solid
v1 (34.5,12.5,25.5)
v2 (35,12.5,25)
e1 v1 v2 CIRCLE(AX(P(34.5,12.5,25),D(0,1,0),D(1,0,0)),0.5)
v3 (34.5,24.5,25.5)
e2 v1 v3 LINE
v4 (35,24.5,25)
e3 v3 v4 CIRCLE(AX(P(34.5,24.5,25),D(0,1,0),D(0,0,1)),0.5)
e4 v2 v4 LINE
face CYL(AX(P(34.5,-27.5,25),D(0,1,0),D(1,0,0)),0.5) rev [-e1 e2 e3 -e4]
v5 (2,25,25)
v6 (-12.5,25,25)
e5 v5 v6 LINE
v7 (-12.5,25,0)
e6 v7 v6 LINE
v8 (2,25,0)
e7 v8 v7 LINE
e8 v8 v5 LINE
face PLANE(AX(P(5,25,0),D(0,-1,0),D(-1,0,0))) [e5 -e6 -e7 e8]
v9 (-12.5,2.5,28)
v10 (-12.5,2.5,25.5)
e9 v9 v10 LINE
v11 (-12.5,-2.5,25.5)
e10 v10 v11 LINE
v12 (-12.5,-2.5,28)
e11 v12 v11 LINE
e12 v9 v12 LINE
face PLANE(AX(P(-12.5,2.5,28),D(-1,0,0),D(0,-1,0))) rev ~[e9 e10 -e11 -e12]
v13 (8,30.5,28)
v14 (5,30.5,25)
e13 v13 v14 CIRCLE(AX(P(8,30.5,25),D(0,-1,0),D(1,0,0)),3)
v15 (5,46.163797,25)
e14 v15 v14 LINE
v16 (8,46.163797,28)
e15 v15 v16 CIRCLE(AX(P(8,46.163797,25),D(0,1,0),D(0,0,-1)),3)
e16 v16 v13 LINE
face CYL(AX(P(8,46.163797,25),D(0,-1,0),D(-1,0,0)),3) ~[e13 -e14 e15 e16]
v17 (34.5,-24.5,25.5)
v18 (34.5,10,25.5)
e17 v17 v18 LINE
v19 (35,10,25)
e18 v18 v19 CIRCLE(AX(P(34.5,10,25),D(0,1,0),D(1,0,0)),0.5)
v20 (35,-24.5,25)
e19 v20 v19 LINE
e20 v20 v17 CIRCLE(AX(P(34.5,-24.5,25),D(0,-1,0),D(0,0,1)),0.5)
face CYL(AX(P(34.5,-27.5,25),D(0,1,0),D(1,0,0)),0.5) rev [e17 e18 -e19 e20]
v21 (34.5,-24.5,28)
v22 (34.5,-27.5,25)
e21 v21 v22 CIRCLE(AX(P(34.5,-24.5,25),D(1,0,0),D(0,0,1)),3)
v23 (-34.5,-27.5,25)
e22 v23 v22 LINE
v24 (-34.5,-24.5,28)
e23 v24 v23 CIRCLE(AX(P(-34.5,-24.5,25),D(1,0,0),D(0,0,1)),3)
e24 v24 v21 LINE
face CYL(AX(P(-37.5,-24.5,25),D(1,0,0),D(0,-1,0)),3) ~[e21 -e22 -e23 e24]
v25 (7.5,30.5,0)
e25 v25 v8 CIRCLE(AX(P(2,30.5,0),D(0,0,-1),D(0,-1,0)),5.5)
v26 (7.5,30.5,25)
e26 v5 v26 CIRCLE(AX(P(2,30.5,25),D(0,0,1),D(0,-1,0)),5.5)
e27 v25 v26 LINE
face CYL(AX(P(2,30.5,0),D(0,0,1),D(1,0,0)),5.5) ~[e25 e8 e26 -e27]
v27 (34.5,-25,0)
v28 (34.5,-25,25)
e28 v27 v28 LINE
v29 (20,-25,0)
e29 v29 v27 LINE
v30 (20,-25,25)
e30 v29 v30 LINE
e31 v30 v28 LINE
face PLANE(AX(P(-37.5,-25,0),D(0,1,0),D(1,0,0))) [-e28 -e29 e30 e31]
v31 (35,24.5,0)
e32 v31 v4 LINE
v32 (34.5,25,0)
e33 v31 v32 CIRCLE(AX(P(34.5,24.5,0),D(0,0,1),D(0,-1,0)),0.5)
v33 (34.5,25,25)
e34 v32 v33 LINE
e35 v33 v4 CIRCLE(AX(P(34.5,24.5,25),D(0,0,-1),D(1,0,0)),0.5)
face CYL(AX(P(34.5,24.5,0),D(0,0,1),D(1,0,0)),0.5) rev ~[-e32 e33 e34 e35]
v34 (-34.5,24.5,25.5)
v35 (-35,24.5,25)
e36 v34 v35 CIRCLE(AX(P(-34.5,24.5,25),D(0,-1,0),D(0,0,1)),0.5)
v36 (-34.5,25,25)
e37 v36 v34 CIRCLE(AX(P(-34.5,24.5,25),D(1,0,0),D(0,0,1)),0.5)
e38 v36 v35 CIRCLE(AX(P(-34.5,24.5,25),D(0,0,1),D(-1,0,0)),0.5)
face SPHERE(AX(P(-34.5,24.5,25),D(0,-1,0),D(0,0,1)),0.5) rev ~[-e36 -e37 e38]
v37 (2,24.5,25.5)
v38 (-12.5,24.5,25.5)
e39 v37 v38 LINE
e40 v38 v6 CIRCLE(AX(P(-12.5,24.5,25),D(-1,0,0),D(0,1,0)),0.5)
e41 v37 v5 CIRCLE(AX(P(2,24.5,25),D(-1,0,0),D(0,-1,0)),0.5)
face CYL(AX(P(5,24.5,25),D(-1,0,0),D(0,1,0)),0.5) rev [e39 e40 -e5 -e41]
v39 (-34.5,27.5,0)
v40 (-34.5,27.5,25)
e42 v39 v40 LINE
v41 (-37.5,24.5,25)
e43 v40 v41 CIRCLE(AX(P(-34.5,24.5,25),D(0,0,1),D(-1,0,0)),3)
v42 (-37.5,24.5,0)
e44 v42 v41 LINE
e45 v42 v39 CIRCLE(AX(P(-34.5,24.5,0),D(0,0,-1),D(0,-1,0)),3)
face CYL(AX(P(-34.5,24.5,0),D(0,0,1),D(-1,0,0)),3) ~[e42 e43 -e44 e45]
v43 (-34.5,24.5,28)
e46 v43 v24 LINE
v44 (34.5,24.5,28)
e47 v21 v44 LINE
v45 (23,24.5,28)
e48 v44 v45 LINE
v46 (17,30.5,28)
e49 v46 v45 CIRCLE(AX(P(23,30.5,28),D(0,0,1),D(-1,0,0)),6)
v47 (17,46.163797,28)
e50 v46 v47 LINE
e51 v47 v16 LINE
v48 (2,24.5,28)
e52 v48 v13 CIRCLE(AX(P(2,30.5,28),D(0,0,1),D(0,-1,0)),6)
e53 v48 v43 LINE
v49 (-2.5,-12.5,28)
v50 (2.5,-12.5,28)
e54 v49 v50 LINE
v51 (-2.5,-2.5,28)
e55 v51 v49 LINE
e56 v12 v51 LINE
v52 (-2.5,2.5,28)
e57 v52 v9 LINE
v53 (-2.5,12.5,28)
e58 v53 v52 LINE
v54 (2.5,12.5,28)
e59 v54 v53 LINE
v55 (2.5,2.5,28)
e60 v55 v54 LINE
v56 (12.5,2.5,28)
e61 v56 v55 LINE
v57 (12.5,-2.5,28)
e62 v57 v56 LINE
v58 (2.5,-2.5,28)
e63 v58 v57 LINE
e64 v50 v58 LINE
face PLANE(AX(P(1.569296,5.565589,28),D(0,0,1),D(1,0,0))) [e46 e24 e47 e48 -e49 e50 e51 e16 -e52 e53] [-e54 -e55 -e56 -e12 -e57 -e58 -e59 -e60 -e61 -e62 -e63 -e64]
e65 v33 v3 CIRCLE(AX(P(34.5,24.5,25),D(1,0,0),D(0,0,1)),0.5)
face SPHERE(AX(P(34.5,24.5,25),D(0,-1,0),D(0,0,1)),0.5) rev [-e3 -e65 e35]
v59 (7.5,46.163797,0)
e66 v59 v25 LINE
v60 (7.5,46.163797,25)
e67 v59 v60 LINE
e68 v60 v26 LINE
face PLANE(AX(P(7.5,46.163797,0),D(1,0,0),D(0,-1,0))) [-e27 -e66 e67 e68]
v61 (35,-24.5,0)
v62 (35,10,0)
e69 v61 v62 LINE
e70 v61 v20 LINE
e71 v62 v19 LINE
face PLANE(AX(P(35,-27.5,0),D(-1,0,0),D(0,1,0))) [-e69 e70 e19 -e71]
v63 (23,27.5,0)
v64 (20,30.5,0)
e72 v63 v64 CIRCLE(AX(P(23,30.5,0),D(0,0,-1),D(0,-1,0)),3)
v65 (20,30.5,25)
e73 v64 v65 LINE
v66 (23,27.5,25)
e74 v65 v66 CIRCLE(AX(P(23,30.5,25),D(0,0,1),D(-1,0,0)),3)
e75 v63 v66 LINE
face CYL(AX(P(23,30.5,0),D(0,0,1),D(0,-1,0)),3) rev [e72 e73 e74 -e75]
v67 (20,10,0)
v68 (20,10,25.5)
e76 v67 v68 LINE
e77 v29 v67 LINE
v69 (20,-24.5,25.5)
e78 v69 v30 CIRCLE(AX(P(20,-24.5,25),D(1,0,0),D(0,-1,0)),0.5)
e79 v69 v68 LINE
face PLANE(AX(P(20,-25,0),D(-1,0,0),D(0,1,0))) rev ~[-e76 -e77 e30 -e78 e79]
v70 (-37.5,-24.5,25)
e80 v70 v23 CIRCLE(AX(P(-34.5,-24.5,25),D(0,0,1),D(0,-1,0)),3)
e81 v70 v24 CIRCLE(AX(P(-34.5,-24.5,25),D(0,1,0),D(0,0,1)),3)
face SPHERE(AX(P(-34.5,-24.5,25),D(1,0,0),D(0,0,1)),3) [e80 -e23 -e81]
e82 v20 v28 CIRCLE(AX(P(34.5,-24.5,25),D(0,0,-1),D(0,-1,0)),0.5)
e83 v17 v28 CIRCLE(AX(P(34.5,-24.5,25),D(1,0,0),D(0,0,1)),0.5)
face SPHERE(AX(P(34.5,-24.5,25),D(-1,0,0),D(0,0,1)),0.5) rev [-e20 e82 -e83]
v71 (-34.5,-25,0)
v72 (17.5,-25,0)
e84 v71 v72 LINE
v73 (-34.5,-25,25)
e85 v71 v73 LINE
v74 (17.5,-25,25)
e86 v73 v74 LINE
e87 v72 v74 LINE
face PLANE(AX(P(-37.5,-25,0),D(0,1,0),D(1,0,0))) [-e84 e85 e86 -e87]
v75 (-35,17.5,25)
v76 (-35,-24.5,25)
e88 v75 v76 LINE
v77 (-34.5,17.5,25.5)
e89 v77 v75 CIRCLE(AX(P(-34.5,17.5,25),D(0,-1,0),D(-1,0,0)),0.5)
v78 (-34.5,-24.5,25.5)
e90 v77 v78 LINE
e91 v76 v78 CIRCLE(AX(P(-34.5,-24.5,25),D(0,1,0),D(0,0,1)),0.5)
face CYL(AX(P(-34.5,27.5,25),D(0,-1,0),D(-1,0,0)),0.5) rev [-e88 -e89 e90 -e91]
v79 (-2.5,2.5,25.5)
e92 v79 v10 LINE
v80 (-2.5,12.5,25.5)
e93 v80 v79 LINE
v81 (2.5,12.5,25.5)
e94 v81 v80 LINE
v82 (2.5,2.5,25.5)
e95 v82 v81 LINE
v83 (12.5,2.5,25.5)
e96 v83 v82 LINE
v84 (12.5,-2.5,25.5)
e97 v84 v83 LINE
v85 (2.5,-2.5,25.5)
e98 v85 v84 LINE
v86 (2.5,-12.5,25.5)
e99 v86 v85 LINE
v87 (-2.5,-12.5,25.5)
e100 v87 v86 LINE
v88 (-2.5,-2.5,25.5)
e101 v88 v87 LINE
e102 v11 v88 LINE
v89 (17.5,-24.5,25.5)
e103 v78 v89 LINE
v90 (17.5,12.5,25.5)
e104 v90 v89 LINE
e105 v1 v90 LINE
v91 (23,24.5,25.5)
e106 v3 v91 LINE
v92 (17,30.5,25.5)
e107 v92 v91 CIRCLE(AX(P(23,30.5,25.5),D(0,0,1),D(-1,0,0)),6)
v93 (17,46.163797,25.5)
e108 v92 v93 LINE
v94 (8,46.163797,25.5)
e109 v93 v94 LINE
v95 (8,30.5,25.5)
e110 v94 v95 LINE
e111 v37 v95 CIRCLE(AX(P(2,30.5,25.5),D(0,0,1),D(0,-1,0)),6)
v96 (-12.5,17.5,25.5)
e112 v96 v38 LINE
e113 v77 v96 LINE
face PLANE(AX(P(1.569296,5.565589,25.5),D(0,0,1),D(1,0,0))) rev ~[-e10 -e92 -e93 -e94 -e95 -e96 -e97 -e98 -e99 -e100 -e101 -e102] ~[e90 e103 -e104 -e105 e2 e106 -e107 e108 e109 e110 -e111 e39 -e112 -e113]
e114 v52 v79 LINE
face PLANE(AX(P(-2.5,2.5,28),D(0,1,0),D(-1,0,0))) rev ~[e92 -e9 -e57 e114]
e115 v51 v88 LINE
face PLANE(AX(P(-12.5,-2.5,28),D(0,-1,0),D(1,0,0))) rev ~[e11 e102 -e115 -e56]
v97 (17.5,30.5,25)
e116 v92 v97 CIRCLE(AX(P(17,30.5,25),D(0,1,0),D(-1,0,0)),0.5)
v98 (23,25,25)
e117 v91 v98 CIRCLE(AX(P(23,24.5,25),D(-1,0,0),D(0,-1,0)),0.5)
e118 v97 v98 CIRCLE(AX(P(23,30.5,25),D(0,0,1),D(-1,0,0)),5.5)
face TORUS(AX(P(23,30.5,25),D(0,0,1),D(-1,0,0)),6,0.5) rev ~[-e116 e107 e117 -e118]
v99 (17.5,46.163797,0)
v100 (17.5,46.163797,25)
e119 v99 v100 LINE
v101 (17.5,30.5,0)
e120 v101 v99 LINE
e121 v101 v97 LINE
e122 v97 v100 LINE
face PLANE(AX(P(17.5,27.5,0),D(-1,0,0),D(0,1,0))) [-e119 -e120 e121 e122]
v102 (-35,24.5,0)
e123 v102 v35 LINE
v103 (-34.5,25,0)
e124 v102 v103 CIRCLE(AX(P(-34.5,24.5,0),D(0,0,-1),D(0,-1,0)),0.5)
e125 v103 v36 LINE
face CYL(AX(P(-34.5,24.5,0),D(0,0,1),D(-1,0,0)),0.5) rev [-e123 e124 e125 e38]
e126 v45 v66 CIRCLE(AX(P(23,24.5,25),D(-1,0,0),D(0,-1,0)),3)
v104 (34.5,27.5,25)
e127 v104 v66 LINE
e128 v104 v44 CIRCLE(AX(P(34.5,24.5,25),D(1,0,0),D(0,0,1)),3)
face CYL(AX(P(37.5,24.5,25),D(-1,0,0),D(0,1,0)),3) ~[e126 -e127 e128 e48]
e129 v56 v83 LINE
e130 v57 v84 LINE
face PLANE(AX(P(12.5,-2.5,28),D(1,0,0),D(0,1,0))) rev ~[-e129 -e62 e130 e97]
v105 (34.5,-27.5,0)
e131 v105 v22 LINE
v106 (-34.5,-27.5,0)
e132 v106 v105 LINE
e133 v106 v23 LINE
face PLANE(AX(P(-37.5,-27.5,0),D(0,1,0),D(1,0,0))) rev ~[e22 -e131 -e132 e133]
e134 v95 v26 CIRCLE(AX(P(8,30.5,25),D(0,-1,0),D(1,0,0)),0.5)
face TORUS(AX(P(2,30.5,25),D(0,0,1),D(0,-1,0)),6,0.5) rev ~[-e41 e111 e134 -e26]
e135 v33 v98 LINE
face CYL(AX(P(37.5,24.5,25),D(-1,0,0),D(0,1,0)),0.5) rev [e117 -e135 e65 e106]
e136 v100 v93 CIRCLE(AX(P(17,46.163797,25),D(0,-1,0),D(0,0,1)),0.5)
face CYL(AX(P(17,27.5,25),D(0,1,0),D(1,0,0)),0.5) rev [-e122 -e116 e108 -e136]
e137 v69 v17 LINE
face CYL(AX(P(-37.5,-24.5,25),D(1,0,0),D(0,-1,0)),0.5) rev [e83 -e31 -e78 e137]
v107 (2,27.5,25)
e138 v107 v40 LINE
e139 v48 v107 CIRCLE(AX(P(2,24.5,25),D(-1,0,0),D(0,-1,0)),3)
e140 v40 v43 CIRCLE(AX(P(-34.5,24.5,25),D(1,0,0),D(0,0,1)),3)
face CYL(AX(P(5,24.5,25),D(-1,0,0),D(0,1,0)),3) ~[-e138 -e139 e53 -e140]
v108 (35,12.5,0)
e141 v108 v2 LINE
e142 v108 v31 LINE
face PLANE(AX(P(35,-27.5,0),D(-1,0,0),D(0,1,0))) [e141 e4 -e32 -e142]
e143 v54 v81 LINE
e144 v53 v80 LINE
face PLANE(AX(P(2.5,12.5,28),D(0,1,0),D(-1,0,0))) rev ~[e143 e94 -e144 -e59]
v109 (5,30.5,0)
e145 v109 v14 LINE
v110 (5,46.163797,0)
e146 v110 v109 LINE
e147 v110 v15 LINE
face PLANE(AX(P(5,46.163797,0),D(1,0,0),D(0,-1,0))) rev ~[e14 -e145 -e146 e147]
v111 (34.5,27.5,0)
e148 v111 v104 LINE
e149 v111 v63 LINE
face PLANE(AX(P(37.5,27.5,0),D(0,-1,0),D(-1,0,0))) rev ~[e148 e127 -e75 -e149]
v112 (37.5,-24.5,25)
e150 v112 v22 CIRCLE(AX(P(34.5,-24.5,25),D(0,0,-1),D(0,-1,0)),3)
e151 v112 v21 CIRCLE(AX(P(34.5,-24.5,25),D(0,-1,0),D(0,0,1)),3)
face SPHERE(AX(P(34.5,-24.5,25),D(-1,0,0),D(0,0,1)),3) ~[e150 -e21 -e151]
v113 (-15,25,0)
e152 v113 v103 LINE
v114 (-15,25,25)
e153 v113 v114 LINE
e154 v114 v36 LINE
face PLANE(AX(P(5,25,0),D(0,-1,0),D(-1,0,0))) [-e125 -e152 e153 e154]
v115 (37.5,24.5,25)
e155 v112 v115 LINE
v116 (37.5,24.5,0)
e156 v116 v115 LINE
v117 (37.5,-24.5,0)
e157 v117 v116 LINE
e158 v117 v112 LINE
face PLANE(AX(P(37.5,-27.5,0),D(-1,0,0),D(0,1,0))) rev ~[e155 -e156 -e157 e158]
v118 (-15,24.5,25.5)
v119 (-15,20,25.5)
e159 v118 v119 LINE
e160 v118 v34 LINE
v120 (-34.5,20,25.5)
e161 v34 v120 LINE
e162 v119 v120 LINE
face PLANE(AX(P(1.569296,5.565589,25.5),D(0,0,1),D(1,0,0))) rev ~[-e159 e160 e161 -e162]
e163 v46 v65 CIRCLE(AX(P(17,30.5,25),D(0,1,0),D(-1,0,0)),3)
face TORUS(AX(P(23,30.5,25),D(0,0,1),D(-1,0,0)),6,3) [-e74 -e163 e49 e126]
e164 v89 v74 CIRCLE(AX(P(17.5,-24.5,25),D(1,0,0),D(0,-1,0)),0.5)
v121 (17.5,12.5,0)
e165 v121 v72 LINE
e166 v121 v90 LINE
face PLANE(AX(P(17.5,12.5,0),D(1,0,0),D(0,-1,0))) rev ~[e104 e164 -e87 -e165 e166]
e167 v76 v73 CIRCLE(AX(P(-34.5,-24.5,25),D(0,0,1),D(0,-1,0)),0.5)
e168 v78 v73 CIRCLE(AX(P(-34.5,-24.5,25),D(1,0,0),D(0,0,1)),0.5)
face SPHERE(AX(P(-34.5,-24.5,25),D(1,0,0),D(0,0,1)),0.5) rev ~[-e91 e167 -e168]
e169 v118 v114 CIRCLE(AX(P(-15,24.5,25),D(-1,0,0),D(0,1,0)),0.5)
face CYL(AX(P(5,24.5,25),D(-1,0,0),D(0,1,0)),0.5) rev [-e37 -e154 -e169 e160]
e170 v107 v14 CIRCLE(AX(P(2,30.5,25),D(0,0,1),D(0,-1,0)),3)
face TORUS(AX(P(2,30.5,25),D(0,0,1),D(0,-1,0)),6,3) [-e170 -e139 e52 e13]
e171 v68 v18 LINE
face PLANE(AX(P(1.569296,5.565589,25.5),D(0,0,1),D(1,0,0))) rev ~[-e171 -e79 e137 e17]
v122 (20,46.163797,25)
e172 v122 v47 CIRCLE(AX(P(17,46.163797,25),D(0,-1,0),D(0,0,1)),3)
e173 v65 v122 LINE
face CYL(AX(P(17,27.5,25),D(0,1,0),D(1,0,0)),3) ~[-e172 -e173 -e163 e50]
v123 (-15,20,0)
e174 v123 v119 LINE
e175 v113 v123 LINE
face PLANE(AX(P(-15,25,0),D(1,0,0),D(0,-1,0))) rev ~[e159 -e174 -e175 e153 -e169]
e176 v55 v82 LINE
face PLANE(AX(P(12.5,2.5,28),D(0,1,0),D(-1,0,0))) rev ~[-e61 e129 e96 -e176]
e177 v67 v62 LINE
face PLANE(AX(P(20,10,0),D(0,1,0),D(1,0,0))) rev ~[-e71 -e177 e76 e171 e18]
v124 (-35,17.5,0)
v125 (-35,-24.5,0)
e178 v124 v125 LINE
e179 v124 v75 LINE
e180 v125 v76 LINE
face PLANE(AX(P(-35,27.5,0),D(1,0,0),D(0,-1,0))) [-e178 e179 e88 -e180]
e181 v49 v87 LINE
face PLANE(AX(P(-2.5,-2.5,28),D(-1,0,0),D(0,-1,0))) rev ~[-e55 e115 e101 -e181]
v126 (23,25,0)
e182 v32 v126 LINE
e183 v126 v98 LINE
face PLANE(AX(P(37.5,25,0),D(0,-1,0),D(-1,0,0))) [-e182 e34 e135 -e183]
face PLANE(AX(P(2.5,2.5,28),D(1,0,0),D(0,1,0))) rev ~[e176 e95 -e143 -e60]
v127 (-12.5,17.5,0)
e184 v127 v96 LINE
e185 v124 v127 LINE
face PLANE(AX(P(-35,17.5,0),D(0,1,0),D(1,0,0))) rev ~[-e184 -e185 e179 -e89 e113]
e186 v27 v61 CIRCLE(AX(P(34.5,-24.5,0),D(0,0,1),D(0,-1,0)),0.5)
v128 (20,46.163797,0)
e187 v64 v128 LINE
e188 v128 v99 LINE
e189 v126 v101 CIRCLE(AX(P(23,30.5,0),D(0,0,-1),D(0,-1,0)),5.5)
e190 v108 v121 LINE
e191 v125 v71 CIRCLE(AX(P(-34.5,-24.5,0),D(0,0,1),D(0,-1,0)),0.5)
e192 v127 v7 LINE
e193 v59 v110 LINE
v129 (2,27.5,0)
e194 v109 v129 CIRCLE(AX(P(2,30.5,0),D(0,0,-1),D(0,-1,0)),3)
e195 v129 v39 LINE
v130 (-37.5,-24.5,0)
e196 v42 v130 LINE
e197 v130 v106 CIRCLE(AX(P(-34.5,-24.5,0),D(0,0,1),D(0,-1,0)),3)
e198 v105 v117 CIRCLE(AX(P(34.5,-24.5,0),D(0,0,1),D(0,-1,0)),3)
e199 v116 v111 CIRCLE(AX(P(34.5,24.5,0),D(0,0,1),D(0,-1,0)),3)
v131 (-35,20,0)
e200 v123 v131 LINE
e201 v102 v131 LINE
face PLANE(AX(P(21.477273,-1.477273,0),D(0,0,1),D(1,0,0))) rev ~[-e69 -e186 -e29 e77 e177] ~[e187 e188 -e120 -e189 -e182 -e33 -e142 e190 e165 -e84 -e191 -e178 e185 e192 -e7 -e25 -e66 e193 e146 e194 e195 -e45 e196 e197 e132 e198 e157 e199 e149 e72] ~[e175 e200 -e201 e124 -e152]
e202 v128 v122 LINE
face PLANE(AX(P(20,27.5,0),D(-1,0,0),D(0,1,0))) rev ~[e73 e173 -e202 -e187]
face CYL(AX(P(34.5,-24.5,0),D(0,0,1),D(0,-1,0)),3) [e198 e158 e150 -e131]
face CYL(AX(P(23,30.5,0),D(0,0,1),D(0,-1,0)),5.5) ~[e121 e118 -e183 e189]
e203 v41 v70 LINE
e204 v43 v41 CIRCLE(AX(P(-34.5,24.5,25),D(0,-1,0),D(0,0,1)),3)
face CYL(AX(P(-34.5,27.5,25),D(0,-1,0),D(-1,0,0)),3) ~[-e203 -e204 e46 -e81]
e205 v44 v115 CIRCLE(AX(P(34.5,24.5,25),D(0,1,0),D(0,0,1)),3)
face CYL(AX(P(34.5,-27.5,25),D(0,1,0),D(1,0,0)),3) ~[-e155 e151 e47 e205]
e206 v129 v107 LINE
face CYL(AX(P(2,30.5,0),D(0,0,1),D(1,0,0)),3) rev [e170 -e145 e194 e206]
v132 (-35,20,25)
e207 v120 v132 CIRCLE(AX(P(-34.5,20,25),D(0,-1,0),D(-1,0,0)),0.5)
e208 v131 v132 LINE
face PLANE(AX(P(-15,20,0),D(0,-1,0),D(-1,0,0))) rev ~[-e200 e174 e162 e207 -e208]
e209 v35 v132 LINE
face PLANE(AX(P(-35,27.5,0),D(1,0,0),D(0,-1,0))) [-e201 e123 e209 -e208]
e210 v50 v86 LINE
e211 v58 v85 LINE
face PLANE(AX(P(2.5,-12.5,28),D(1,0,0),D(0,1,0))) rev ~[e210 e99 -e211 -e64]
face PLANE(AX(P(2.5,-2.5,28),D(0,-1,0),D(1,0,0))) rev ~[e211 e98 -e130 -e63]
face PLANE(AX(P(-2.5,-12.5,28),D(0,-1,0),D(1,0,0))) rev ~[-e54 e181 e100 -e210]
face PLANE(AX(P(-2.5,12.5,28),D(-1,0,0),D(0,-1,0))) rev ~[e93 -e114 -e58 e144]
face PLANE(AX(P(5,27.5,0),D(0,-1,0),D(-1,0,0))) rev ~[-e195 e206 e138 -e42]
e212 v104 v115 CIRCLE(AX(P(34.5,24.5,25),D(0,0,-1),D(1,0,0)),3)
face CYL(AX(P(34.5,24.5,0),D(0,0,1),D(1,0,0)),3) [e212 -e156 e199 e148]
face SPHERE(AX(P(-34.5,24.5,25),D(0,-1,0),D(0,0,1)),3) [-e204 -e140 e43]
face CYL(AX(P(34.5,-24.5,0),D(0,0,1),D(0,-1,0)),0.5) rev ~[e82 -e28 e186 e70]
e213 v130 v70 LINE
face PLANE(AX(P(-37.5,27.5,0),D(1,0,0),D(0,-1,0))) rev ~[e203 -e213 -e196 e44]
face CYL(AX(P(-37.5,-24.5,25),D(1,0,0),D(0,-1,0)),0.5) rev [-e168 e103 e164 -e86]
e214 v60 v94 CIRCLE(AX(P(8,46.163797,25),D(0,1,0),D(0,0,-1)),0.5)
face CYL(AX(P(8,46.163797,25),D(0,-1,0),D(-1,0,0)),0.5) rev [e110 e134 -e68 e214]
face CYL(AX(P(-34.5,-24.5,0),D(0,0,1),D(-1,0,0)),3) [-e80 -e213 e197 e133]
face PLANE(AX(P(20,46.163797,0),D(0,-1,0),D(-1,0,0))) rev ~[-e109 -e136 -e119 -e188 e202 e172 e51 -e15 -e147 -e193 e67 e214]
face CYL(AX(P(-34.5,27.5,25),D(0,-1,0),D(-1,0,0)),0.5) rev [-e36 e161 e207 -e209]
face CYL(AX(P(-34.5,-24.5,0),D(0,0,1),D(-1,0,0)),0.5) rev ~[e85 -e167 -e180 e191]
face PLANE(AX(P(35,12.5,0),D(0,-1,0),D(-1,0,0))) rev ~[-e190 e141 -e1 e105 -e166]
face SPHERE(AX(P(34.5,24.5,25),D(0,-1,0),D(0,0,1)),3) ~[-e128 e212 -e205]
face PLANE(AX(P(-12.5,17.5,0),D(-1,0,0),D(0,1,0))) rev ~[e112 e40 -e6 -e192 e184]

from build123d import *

# Parameters (mm, degrees)
F1_DEPTH = 28
F2_R     = 3
F3_T     = -2.5
F5_DEPTH = 25.5
F7_DEPTH = 2.5


with BuildPart() as f1:
    # F0 (on Top) → F1 (new body)
    with BuildSketch(Plane.XY):
        Polygon((-37.5, 27.5), (-37.5, -27.5), (37.5, -27.5), (37.5, 27.5), (20, 27.5), (20, 46.1637973785), (5, 46.1637973785), (5, 27.5), align=None)
    extrude(amount=F1_DEPTH)

    # F2
    f2_edges = [f1.edges().sort_by_distance(p)[0] for p in [
        (0, -27.5, 28),
        (37.5, 0, 28),
        (28.75, 27.5, 28),
        (37.5, 27.5, 14),
        (-37.5, 0, 28),
        (37.5, -27.5, 14),
        (-37.5, -27.5, 14),
        (-16.25, 27.5, 28),
        (5, 36.831899, 28),
        (5, 27.5, 14),
        (-37.5, 27.5, 14),
        (20, 27.5, 14),
        (20, 36.831899, 28),
    ]]
    fillet(f2_edges, radius=F2_R)

    # F3
    f3_openings = [f1.faces().sort_by_distance(p)[0] for p in [
        (0.806106, 2.36763, 0),
        (12.5, 46.163797, 13.876264),
    ]]
    offset(amount=F3_T, openings=f3_openings)

    # F4 (on Top) → F5 (join, through all)
    with BuildSketch(Plane.XY):
        Polygon((17.5, 12.5), (17.5, -25), (20, -25), (20, 10), (35, 10), (35, 12.5), align=None)
        Polygon((-12.5, 17.5), (-12.5, 25), (-15, 25), (-15, 20), (-35, 20), (-35, 17.5), align=None)
    extrude(amount=F5_DEPTH)

    # F6 (on face) → F7 (cut, through all)
    with BuildSketch(Plane.XY.offset(28)):
        Polygon((2.5, 12.5), (-2.5, 12.5), (-2.5, 2.5), (-12.5, 2.5), (-12.5, -2.5), (-2.5, -2.5), (-2.5, -12.5), (2.5, -12.5), (2.5, -2.5), (12.5, -2.5), (12.5, 2.5), (2.5, 2.5), align=None)
    extrude(amount=-F7_DEPTH, mode=Mode.SUBTRACT)


solid = f1.part
